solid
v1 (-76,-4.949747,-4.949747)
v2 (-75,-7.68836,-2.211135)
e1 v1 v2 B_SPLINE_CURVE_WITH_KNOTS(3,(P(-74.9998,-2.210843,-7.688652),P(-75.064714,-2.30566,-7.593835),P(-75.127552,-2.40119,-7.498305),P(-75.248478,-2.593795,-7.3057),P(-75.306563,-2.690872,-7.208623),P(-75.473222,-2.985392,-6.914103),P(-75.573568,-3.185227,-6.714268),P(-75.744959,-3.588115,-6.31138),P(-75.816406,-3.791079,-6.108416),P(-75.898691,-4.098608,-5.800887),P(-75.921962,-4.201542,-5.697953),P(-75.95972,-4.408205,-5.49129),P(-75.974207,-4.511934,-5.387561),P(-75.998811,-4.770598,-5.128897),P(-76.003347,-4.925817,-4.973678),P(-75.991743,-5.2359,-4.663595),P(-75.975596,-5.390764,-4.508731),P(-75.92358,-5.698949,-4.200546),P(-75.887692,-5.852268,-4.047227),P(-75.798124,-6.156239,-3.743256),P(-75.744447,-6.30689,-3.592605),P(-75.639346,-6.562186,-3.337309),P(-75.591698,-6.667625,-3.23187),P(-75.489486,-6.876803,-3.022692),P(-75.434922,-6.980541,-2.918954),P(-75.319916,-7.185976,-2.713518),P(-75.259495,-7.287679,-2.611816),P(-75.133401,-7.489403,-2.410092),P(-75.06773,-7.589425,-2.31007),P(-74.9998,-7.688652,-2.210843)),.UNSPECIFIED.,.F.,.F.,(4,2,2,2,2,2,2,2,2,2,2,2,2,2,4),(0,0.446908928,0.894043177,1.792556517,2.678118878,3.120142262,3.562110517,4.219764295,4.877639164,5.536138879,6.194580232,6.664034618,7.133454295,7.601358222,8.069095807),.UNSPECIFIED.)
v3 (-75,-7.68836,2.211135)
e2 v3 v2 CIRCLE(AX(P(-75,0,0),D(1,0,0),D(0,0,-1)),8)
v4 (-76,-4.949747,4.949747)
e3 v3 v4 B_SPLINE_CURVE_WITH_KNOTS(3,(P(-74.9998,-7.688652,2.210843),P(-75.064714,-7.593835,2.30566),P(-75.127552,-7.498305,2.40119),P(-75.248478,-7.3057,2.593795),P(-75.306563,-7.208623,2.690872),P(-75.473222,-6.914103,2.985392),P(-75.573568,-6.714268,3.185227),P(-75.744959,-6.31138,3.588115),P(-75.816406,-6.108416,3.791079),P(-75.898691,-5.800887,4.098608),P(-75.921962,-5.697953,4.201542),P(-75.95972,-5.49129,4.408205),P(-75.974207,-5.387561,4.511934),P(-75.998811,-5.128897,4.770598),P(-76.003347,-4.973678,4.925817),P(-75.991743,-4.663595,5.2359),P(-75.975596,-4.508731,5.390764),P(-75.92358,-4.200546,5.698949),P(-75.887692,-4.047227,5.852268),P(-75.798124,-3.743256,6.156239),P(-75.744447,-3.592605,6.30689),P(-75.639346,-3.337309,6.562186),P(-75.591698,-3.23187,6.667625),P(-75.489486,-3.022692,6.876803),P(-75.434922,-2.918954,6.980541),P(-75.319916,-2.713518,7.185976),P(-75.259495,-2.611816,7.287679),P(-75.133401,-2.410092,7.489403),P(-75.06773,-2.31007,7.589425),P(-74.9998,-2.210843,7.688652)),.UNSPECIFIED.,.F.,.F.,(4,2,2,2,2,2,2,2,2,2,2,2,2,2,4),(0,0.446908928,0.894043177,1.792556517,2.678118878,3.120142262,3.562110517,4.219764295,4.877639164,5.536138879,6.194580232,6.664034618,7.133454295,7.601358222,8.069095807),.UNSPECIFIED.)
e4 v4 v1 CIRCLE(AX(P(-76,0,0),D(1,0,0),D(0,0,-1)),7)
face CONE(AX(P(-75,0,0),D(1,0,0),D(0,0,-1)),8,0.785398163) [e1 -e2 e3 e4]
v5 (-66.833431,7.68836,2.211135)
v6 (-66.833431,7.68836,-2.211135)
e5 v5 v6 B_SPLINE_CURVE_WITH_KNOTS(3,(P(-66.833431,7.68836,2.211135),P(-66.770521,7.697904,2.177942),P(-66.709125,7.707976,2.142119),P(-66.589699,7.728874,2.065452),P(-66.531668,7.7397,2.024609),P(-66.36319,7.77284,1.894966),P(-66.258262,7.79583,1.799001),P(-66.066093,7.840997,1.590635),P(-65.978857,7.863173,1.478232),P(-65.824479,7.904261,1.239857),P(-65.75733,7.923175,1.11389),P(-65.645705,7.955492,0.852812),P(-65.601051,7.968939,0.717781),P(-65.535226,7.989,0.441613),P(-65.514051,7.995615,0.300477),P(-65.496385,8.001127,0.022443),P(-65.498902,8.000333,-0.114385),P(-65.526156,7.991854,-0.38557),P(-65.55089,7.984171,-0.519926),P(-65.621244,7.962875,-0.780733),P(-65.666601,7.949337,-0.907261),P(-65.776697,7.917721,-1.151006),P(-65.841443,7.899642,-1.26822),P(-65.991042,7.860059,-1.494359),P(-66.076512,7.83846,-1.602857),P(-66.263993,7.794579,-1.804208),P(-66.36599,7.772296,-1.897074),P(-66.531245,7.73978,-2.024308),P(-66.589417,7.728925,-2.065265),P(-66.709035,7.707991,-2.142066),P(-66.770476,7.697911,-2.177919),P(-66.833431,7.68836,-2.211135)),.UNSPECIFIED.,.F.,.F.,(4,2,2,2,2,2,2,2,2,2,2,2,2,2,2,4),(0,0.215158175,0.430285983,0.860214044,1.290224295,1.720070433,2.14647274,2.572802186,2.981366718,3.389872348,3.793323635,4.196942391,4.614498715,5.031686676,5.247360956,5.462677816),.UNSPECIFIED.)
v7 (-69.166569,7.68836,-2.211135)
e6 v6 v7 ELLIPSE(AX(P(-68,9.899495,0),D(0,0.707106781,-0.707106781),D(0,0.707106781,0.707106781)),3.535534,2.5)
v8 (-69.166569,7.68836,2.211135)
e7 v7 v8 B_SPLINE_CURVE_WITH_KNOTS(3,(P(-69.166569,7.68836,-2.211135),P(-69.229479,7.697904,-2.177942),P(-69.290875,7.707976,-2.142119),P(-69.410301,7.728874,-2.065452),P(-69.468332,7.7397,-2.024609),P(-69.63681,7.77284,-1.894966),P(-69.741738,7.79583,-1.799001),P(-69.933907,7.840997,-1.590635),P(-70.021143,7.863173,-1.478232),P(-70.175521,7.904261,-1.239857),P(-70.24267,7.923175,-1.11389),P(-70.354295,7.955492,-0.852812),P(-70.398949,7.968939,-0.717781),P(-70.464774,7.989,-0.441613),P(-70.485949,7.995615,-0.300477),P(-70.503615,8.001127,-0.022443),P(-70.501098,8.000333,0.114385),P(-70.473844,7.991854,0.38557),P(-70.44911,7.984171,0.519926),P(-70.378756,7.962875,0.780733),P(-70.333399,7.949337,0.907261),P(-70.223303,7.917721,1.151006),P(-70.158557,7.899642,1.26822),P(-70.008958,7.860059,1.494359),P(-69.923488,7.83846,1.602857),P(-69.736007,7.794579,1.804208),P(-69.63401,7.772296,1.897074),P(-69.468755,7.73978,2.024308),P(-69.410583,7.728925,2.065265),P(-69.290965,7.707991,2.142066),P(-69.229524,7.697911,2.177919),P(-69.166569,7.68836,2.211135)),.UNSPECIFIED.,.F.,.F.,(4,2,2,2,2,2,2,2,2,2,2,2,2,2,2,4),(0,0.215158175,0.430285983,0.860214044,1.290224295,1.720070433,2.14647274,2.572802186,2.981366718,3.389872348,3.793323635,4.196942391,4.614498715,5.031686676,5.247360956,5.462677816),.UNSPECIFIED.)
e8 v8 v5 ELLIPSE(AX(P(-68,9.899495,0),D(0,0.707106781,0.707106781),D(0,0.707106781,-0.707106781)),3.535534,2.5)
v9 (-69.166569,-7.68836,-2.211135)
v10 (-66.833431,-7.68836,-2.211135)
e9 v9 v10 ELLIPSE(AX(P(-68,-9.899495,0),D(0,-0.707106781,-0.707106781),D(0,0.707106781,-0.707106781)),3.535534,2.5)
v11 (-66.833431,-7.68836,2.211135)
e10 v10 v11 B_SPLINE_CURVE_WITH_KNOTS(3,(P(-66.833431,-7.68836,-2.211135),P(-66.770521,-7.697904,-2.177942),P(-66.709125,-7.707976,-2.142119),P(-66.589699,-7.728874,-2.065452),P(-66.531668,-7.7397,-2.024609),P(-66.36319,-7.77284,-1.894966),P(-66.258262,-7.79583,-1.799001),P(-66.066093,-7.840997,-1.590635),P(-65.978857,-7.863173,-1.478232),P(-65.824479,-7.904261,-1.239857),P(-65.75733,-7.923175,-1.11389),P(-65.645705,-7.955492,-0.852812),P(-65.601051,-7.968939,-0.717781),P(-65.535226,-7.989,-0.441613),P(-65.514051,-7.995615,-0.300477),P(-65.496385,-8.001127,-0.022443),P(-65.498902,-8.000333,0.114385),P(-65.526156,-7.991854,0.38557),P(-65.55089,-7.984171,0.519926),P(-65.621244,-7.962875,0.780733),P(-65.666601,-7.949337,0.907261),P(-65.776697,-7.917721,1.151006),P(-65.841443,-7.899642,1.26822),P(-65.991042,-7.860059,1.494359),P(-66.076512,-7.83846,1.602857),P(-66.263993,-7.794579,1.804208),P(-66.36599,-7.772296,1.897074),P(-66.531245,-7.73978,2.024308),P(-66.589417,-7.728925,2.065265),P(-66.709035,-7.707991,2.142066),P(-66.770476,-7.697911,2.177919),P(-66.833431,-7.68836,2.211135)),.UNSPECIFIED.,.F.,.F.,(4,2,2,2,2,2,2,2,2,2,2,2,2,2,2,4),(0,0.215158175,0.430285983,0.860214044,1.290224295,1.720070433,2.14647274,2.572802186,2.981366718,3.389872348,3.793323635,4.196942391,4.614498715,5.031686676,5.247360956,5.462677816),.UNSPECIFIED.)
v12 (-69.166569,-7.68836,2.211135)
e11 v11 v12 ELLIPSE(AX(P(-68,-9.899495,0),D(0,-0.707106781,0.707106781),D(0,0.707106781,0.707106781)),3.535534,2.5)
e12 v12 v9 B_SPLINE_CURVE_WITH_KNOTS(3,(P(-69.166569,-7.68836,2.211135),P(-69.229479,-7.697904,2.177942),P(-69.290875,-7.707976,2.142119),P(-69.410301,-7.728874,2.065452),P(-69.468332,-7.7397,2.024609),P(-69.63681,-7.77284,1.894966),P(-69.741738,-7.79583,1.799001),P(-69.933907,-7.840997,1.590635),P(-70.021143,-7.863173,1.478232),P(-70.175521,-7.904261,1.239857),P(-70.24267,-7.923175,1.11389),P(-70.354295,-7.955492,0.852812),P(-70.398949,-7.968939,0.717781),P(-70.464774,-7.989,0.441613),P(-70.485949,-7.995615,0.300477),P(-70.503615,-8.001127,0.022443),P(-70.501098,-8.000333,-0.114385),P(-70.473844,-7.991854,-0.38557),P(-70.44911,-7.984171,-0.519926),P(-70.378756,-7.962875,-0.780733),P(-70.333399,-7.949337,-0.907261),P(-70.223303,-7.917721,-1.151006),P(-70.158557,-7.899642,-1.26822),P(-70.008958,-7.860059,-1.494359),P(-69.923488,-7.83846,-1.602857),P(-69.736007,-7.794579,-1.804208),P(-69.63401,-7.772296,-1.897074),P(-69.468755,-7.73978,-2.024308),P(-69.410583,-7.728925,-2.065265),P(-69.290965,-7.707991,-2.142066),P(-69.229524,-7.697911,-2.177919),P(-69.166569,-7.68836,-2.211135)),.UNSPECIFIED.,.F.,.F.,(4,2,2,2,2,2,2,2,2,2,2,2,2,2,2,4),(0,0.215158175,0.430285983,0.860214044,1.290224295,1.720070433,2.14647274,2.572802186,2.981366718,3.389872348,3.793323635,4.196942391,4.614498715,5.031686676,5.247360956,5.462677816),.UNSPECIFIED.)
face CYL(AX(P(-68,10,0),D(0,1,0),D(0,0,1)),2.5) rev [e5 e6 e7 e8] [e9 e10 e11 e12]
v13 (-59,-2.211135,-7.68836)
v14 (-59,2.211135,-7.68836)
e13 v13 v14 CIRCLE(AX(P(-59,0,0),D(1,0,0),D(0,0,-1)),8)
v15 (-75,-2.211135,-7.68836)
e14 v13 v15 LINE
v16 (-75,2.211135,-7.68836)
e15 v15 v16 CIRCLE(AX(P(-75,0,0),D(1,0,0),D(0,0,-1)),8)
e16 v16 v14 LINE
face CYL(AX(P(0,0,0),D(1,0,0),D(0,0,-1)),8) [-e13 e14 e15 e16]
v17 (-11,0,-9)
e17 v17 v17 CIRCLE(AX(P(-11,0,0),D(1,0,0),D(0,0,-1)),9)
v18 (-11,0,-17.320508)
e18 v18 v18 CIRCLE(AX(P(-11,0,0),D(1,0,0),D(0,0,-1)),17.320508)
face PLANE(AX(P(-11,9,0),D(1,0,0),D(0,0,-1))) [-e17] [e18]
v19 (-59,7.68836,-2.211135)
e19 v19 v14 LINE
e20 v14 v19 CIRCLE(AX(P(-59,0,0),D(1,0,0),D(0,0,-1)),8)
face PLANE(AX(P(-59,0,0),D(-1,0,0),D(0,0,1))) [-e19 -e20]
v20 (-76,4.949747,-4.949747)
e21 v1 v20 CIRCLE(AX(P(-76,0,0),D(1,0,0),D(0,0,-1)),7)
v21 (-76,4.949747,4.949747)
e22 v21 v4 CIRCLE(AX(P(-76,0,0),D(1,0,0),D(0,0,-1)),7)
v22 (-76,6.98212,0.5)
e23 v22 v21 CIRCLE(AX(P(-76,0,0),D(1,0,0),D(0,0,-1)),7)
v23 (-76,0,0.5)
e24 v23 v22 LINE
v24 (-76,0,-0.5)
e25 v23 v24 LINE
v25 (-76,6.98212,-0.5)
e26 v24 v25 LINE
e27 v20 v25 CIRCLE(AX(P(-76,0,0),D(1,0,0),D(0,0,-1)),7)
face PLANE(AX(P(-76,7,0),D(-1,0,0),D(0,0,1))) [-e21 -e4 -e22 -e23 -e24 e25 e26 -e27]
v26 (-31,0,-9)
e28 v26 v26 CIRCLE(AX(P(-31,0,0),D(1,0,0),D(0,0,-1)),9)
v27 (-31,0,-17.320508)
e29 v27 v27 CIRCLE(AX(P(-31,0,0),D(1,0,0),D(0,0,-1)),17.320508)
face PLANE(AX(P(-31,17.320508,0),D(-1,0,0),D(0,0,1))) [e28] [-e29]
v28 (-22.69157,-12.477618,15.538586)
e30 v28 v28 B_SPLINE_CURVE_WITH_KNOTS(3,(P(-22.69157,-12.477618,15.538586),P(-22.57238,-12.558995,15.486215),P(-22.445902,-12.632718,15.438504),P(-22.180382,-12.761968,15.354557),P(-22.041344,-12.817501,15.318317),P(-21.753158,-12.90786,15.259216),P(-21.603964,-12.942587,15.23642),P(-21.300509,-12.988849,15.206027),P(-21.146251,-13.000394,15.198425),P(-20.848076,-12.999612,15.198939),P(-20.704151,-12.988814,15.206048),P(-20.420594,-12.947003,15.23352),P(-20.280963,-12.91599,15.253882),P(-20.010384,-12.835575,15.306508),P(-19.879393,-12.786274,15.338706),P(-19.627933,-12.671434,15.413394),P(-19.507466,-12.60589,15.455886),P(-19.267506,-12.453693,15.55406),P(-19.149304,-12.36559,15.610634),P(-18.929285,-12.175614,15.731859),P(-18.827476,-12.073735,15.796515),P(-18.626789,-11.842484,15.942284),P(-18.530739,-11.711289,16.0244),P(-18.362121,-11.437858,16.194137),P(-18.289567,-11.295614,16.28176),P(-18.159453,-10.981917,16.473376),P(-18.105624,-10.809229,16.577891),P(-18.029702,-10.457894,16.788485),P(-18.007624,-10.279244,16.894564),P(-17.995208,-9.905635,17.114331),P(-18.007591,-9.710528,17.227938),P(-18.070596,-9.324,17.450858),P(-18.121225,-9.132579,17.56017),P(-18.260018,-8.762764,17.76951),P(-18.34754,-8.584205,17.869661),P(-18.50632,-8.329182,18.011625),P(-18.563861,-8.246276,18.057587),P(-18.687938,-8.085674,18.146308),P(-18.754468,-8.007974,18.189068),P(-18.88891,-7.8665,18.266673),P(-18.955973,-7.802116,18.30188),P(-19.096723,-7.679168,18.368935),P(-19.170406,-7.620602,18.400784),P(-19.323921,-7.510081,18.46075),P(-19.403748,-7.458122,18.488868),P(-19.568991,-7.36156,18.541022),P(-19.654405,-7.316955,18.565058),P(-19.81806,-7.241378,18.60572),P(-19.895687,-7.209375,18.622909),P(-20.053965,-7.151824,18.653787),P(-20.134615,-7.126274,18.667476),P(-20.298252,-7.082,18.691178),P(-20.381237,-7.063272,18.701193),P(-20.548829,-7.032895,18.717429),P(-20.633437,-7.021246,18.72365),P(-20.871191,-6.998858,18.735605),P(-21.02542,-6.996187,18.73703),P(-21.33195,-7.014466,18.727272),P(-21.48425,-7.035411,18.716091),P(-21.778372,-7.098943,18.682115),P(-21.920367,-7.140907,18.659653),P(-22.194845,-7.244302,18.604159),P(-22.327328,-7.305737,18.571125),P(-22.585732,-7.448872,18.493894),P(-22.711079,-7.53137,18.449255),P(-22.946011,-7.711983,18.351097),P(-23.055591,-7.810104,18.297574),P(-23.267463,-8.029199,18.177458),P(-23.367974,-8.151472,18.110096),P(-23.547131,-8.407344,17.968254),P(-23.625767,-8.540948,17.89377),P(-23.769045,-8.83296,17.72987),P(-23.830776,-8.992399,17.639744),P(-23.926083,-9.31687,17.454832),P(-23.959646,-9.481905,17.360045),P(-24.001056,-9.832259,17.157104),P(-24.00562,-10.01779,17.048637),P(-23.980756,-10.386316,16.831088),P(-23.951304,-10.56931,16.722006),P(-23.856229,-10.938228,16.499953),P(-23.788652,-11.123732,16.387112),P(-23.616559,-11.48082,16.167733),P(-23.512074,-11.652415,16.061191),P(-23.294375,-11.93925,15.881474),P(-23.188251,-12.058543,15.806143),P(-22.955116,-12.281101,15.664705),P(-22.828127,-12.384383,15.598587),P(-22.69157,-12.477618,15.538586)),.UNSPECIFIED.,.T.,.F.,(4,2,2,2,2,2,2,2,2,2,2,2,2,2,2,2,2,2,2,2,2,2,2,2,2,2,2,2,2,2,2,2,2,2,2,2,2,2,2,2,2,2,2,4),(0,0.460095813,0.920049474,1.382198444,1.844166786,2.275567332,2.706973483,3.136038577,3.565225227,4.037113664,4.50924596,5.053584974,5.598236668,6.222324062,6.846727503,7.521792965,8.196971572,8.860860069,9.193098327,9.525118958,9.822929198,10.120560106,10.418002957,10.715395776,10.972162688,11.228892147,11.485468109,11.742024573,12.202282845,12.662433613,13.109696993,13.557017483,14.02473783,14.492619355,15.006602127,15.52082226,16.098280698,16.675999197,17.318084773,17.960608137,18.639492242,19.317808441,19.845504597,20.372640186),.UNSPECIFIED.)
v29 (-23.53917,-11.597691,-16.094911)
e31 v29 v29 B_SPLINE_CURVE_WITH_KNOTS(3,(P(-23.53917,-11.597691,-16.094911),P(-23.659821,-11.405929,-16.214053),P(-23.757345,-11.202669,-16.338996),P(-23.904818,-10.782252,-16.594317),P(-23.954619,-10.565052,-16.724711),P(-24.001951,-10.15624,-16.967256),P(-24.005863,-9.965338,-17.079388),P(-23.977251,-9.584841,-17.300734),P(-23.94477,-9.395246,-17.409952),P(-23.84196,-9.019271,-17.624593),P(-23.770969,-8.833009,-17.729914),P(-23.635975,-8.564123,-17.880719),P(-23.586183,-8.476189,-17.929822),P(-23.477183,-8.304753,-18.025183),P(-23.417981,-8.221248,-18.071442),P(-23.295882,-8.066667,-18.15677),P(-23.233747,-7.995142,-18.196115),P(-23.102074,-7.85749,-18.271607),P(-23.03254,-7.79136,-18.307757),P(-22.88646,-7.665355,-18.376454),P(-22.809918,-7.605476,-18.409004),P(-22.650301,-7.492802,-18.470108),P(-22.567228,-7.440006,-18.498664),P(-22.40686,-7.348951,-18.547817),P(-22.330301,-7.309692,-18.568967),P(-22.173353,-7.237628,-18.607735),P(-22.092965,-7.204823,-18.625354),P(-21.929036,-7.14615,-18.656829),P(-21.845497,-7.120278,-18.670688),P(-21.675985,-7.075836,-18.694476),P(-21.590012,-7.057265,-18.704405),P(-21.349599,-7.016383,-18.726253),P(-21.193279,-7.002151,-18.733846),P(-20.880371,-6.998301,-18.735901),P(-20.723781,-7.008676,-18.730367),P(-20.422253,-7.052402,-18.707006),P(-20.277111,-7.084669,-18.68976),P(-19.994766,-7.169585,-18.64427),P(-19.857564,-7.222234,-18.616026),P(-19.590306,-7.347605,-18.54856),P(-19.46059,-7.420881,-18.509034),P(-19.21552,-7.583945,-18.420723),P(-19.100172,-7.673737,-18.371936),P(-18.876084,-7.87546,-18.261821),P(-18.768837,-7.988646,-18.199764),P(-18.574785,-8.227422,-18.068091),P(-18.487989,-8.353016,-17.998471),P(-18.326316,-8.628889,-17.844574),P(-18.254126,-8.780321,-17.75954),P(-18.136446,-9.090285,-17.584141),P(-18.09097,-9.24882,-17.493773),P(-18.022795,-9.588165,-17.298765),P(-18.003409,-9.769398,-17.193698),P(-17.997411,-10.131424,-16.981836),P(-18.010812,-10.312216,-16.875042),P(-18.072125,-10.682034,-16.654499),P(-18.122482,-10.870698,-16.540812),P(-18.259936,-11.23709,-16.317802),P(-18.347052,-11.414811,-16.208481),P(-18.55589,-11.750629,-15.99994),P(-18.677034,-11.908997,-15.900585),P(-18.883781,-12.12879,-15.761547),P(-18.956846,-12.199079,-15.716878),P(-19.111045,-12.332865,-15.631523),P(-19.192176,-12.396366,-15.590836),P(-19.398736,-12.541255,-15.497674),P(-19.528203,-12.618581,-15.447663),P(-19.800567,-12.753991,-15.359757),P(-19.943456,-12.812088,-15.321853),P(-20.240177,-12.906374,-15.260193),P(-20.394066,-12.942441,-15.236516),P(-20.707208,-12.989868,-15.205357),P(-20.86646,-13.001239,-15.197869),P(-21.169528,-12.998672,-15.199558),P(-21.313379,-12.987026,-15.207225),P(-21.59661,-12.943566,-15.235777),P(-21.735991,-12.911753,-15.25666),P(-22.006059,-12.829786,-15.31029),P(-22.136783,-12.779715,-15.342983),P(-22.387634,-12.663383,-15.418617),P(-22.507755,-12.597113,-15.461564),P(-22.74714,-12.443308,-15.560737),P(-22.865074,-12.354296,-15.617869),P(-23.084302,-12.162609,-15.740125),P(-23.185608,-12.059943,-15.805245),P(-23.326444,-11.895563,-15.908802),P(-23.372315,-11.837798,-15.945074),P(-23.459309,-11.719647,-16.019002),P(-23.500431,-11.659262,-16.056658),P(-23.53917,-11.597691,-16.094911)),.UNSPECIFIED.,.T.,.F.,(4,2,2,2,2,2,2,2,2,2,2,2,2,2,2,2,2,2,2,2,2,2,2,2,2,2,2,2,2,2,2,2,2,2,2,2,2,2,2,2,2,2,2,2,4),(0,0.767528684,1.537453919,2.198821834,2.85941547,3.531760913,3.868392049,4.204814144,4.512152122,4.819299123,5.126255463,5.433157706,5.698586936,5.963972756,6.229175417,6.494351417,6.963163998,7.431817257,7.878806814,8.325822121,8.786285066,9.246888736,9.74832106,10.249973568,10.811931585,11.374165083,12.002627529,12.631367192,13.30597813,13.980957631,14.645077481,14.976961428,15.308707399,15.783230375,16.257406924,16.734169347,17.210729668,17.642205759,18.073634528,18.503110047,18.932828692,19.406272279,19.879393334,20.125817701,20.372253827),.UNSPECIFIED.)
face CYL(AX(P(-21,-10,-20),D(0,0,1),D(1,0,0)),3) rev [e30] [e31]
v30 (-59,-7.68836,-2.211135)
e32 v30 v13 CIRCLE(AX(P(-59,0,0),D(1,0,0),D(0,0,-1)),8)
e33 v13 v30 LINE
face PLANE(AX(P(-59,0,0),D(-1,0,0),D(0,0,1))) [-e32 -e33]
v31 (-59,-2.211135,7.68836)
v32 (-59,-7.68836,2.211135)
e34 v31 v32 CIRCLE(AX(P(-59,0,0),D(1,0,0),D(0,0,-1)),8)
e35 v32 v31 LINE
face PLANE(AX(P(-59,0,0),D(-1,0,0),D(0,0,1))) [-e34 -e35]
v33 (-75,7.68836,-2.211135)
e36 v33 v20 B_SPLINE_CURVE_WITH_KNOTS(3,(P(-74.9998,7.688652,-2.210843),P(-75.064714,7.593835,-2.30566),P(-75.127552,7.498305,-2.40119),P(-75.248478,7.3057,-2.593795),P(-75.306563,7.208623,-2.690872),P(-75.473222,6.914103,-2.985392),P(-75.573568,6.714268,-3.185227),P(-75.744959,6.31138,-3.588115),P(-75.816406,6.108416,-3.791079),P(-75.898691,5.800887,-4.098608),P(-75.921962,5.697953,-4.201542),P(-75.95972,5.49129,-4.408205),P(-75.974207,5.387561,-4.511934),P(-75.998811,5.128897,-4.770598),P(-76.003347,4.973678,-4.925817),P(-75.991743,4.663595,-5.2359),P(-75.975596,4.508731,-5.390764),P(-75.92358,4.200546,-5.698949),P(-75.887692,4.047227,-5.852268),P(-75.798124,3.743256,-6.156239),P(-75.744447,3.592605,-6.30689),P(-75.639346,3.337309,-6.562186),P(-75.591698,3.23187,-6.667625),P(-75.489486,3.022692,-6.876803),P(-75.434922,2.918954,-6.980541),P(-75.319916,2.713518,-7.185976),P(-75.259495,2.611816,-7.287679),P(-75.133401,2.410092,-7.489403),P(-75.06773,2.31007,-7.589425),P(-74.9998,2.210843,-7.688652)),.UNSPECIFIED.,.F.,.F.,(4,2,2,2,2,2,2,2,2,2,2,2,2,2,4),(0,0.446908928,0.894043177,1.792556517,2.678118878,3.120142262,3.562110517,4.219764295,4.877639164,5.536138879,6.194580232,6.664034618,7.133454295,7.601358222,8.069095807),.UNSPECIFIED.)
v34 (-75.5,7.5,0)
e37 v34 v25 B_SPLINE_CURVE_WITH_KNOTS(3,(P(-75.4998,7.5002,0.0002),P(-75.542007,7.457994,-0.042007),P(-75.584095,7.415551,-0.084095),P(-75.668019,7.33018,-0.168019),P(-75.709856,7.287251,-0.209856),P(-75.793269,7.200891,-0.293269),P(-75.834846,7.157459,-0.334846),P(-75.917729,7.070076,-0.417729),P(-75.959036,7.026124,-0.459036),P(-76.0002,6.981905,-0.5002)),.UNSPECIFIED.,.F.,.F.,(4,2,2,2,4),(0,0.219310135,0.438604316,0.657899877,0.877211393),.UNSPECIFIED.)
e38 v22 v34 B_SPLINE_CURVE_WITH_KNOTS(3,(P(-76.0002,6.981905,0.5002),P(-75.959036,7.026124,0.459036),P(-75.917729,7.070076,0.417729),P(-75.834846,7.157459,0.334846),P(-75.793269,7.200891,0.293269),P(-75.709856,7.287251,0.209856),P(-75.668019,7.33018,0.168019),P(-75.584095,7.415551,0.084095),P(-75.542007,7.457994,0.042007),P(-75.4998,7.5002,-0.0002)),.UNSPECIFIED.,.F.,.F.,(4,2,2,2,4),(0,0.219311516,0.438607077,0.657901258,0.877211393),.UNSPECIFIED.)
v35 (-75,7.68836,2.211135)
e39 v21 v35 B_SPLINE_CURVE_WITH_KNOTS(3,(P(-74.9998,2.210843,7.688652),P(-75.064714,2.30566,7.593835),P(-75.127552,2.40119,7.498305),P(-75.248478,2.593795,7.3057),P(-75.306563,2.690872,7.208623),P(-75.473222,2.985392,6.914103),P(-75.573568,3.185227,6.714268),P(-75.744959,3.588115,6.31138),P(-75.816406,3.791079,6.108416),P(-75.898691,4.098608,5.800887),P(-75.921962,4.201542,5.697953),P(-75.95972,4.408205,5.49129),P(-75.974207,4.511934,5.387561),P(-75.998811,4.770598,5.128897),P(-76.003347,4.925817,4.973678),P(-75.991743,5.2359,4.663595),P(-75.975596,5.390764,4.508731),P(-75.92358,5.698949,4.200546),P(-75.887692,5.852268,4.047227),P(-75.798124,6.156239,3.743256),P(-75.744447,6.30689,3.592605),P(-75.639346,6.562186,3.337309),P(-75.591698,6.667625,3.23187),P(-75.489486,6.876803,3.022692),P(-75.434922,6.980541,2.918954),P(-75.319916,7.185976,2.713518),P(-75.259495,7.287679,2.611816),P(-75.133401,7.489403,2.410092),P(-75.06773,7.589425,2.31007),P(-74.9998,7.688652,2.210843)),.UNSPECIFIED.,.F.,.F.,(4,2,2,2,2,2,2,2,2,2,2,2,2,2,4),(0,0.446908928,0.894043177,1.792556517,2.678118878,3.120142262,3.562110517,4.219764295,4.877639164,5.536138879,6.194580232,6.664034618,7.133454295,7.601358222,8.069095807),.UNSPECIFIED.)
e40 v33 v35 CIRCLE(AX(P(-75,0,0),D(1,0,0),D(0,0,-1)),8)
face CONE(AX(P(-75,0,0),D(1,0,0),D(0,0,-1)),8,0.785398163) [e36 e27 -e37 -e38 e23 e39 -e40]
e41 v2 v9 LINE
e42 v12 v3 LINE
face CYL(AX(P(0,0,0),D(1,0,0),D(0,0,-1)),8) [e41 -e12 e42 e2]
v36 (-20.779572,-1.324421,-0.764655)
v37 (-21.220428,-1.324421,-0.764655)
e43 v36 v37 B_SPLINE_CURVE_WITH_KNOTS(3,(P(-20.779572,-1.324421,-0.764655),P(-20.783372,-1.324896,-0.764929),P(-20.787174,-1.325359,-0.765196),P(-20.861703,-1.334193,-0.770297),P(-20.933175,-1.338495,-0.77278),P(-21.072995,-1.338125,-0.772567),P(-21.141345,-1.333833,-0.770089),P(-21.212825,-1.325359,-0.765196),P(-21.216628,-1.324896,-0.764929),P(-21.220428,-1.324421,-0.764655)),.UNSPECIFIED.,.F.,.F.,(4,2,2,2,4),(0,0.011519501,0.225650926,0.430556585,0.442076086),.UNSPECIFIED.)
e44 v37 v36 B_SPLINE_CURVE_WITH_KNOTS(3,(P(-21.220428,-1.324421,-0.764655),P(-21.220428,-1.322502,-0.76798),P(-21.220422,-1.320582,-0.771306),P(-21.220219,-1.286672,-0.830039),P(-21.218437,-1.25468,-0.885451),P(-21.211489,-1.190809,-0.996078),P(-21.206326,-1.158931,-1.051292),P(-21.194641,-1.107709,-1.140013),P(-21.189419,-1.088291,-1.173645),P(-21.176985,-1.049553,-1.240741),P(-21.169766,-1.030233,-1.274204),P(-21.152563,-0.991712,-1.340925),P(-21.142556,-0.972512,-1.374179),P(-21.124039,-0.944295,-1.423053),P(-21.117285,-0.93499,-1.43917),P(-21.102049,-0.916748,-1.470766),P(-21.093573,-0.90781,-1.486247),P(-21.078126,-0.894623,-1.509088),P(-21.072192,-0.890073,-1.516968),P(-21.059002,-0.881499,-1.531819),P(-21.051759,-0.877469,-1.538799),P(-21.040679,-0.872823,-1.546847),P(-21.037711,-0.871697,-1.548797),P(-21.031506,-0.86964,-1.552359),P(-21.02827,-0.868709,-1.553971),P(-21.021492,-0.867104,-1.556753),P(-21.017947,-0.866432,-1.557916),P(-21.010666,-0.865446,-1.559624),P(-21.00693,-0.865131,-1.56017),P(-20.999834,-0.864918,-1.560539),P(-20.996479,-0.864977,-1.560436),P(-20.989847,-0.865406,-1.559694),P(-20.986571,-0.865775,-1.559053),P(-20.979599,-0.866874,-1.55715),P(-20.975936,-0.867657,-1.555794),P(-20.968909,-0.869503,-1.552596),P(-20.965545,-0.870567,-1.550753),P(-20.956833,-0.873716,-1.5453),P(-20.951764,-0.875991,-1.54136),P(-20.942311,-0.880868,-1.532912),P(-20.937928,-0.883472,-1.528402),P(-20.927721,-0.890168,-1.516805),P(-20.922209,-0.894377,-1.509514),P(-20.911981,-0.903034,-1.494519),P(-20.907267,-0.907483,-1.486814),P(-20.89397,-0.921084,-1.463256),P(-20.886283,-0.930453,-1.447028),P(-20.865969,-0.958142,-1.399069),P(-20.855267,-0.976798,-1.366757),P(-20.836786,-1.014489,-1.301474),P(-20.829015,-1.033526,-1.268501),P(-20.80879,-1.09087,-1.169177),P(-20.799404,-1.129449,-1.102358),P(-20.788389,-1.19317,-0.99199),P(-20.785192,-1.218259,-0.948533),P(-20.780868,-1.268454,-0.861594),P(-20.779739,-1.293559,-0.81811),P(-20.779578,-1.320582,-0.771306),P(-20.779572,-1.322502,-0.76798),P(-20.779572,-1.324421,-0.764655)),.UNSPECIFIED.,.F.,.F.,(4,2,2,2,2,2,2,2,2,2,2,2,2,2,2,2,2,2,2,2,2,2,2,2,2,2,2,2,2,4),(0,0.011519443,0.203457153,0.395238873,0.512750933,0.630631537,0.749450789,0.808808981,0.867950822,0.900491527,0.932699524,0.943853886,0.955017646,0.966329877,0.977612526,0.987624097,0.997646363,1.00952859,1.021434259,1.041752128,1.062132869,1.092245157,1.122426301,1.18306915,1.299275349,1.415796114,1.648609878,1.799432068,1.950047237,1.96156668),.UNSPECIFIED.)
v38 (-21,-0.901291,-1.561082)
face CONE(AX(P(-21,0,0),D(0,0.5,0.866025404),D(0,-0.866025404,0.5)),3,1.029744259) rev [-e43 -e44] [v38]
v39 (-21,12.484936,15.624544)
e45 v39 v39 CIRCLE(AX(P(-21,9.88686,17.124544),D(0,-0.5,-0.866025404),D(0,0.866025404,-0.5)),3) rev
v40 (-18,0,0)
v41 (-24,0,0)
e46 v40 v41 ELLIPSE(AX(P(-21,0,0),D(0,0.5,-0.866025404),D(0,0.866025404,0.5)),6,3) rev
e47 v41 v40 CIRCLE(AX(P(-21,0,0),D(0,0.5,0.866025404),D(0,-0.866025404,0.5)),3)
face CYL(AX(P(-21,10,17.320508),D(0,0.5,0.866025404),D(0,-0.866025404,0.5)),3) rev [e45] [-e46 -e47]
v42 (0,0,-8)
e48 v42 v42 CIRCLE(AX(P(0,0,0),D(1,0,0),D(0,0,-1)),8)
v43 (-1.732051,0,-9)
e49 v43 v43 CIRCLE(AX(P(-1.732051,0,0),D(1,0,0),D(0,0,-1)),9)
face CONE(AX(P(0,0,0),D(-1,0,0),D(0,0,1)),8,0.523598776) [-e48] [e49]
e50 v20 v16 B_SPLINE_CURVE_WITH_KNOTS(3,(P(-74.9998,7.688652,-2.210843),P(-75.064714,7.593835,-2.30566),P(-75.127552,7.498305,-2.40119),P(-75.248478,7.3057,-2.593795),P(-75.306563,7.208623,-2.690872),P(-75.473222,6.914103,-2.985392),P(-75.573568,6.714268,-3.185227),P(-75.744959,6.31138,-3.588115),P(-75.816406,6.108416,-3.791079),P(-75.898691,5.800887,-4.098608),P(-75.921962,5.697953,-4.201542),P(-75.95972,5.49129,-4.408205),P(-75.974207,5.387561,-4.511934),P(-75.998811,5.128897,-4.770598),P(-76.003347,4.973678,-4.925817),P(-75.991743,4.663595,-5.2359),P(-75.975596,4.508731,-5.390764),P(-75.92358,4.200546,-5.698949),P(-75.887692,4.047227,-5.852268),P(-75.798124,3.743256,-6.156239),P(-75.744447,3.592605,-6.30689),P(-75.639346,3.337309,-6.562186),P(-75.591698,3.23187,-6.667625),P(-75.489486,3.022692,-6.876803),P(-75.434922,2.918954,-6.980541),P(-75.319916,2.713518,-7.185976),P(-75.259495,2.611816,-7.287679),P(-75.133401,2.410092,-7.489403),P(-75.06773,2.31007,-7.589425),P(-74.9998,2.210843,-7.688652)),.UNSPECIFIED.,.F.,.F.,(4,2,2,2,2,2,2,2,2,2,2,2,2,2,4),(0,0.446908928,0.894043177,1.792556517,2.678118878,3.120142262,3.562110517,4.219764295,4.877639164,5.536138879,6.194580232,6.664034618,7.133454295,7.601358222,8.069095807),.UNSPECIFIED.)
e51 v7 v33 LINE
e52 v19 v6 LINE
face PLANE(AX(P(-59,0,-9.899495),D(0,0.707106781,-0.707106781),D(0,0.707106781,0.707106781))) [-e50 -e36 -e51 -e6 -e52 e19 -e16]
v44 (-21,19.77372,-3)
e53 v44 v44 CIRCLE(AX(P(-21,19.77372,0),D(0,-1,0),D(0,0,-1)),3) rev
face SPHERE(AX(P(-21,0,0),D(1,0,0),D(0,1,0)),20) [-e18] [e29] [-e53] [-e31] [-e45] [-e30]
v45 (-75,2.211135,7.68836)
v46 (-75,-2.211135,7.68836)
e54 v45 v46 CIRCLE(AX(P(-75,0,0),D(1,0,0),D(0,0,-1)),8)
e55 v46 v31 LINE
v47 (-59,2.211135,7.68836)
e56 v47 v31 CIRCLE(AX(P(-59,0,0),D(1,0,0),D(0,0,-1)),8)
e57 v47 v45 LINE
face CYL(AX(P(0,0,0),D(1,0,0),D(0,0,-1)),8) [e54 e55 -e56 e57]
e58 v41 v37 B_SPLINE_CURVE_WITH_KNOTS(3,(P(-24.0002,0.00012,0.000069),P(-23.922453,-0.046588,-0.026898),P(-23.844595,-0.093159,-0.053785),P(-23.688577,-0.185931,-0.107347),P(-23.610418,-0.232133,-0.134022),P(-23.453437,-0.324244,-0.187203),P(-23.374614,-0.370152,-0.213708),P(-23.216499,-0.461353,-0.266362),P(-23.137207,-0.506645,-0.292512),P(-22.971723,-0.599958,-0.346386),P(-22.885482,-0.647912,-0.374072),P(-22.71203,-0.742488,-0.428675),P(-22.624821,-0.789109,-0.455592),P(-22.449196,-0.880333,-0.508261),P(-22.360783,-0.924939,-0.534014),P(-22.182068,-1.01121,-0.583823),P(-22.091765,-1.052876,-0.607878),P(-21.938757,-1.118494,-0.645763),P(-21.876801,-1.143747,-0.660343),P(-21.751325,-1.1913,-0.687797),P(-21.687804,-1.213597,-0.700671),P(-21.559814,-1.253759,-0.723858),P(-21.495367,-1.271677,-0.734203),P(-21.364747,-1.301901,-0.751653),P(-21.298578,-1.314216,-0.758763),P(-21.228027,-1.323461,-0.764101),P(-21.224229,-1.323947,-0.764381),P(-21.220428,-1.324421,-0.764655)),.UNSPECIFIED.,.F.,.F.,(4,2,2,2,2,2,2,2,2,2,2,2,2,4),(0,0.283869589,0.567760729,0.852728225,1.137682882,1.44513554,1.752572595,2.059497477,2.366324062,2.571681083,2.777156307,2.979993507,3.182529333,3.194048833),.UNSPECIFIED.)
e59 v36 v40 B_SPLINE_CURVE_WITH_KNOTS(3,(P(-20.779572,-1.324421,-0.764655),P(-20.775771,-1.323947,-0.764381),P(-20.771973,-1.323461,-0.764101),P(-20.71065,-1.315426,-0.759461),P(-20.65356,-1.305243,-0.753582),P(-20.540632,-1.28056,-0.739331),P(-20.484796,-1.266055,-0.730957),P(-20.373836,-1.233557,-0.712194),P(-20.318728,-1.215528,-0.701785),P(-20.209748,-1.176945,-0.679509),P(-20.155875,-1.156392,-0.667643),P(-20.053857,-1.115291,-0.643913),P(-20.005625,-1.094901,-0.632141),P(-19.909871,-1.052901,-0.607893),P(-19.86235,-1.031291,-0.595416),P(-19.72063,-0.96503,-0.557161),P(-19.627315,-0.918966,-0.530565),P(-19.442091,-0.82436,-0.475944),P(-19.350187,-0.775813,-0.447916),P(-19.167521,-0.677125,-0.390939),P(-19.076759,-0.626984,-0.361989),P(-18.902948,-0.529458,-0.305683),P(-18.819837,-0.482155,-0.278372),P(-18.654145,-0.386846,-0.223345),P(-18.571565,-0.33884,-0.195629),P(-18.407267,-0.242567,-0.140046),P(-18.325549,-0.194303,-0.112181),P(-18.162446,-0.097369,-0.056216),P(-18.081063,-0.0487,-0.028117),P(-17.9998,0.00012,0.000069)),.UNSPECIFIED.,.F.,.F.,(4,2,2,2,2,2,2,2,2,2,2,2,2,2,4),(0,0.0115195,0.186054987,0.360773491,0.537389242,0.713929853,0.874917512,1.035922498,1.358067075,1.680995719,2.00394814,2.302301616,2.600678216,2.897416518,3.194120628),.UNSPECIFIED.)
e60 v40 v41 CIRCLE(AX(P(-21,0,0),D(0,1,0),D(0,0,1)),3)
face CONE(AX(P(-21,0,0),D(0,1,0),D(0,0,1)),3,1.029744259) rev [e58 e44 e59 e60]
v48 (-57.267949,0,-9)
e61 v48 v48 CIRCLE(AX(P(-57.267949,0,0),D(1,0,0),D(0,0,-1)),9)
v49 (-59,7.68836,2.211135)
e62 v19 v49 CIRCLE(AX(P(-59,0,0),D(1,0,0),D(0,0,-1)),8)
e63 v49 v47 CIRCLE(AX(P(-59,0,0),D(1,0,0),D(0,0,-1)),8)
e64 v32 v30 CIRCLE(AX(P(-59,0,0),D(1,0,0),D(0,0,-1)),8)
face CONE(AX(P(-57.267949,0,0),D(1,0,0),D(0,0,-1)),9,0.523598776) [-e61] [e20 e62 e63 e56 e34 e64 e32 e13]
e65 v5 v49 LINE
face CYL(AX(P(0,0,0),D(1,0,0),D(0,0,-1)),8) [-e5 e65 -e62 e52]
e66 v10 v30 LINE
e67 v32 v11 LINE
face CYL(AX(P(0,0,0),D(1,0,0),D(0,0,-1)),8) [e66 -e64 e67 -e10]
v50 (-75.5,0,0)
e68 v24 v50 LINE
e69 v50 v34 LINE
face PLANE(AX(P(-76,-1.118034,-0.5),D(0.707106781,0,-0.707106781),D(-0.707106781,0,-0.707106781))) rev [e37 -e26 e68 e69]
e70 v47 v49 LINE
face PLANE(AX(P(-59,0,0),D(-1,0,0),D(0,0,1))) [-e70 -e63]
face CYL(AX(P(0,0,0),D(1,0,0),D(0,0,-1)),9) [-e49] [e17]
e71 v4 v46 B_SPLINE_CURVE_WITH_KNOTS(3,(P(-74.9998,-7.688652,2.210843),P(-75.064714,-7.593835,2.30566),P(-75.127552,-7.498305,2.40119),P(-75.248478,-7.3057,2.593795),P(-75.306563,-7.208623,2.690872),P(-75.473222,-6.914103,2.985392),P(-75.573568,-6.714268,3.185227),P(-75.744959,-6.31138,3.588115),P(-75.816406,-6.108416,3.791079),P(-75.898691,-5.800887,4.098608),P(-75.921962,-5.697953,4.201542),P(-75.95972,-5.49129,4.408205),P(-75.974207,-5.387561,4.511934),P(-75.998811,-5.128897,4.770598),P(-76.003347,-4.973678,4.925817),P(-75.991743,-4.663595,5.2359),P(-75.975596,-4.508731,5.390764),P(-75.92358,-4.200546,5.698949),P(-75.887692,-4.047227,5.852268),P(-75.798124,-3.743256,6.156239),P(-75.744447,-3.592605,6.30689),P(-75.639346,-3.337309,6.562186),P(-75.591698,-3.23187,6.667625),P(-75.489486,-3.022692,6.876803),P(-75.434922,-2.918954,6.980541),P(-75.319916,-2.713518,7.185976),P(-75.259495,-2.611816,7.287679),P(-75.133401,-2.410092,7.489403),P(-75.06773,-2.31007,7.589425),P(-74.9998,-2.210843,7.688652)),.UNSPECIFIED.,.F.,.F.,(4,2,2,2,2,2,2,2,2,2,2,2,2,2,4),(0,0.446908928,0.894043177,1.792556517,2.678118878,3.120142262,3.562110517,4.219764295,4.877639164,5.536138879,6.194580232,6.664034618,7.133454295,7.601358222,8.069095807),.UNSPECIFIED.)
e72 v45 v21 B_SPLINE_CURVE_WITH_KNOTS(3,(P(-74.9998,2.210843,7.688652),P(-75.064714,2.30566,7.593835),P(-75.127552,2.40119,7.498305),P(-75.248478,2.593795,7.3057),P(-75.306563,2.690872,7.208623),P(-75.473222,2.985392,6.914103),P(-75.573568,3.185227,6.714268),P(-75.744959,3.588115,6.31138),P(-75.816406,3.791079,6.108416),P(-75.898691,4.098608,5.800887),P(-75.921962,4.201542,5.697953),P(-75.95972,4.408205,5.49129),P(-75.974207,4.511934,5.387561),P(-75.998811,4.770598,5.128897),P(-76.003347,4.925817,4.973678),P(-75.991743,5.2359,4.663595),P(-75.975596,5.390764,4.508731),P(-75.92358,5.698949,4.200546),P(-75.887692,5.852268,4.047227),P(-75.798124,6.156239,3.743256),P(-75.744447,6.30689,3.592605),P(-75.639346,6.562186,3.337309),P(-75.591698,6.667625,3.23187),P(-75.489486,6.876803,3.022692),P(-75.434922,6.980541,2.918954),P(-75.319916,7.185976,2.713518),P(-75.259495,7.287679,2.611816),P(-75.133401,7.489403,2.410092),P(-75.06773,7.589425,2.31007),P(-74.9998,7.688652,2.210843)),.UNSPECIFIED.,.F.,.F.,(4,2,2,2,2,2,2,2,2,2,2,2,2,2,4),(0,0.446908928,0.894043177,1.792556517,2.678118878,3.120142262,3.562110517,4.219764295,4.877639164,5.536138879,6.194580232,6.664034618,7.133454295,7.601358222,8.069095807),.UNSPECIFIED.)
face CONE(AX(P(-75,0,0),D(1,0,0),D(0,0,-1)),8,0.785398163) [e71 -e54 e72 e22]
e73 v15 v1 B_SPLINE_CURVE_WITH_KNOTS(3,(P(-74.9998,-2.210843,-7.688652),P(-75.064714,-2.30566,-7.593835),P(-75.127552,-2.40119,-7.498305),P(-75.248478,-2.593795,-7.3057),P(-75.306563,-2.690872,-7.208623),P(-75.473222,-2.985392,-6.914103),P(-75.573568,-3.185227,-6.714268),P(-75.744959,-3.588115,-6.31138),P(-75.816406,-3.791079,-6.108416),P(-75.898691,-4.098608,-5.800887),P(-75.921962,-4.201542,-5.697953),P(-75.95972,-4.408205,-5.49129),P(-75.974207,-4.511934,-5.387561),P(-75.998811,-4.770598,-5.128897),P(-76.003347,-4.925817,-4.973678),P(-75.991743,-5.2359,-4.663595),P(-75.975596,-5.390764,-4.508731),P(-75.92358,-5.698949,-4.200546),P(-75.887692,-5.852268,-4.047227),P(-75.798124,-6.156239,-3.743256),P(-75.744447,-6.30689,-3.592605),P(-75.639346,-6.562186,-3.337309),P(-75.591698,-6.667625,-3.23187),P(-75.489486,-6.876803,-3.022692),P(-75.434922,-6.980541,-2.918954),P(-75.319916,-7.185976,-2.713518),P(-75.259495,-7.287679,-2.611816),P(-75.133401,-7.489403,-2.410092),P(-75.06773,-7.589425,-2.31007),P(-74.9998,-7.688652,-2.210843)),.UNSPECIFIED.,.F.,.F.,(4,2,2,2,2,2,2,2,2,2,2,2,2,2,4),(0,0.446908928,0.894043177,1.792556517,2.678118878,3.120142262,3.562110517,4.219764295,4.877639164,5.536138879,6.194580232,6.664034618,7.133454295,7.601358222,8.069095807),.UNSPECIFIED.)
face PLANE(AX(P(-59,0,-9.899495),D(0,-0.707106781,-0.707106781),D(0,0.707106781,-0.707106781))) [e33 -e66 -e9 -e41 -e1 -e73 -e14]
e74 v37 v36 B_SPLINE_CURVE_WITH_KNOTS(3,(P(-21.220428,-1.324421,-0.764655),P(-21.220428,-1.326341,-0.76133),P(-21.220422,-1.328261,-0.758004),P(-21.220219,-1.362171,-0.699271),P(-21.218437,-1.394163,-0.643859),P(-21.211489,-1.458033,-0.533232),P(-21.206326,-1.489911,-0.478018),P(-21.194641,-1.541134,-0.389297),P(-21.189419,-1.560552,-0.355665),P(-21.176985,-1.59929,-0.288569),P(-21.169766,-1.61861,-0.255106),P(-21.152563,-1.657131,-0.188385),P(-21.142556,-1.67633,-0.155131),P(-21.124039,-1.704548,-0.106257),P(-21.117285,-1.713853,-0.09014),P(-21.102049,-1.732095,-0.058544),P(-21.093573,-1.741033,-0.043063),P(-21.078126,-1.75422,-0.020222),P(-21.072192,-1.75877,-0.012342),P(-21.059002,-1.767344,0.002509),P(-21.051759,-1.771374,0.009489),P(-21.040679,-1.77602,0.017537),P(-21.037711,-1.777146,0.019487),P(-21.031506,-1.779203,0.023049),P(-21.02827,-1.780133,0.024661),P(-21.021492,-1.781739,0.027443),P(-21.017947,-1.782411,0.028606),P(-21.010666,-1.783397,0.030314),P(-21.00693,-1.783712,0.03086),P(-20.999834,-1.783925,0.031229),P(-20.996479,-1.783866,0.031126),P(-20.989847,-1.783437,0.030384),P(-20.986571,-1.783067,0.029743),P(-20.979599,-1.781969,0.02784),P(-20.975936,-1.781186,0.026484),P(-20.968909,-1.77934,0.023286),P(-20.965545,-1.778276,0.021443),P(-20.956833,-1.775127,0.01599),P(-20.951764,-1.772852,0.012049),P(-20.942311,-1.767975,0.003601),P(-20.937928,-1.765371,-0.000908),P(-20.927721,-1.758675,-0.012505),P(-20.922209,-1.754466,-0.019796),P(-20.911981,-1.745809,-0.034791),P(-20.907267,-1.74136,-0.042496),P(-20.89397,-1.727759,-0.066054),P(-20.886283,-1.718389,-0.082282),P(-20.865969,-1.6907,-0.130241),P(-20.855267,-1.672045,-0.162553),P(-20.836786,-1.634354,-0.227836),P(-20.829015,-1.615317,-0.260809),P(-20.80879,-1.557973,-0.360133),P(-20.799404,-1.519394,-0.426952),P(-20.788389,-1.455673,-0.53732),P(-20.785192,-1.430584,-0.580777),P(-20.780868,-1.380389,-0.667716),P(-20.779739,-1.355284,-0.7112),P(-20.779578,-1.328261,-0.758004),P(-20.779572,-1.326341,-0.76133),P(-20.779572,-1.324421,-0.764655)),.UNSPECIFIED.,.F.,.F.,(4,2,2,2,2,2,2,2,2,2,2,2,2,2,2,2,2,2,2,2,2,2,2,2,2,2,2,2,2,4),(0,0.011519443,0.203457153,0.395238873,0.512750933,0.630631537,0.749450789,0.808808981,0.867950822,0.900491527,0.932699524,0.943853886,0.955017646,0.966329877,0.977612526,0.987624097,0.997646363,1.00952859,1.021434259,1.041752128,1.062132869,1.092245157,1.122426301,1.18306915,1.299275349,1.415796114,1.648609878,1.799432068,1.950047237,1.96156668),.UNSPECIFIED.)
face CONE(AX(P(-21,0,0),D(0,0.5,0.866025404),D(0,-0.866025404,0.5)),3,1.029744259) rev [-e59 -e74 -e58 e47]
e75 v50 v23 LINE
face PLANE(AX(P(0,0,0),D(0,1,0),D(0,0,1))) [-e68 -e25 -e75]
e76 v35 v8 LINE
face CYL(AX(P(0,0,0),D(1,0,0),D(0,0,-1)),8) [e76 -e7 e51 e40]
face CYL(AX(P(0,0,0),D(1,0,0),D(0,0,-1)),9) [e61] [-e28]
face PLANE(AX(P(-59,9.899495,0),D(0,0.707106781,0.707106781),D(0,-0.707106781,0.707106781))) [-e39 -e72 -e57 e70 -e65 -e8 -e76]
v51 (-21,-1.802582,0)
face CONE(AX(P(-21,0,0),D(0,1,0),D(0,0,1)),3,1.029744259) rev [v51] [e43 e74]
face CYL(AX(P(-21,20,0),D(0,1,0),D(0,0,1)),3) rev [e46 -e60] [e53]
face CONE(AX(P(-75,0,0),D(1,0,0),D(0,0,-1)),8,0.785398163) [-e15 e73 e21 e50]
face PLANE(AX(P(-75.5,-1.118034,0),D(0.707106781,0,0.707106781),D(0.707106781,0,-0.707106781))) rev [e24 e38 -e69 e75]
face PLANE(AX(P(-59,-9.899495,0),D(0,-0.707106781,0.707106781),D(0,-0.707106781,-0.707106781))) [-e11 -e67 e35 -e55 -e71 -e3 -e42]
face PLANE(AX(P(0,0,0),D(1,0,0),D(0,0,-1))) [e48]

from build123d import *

# Parameters (mm, degrees)
CUT_EXTRUDE_1_DEPTH      = 82.092539731
CUT_EXTRUDE_1_DEPTH_BACK = 82.092539731
SKETCH_2_R               = 3
PATTERN_CIRCULAR_1_COUNT = 2
PATTERN_CIRCULAR_1_ANGLE = 60
SKETCH_6_OUTSIDE_W       = 60.93
SKETCH_6_OUTSIDE_H       = 60.704
CUT_EXTRUDE_2_DEPTH      = 17
HOLE_WIZARD_M61_D        = 5
CUT_EXTRUDE_3_DEPTH      = 10


with BuildPart() as part:
    # Эскиз1 → Повернуть1 (revolve)
    with BuildSketch(Plane.XY, mode=Mode.PRIVATE) as revolve_1_sk:
        with BuildLine():
            Line((0, 0), (0, 8))
            Line((0, 8), (-1.732050808, 9))
            Line((-1.732050808, 9), (-11, 9))
            Line((-11, 9), (-11, 17.320508076))
            ThreePointArc((-11, 17.320508076), (-21, 20), (-31, 17.320508076))
            Line((-31, 17.320508076), (-31, 9))
            Line((-31, 9), (-57.267949192, 9))
            Line((-57.267949192, 9), (-59, 8))
            Line((-59, 8), (-75, 8))
            Line((-75, 8), (-76, 7))
            Line((-76, 7), (-76, 0))
            Line((-76, 0), (0, 0))
        make_face()
    revolve(revolve_1_sk.sketch.rotate(Axis((0, 0, 0), (-1, 0, 0)), 90), axis=Axis((0, 0, 0), (-1, 0, 0)))

    # Эскиз2 → Вырез-Вытянуть1 (cut, two sides: drawn at the far end of the back side and taken through both)
    with BuildSketch(Plane.XY.offset(-CUT_EXTRUDE_1_DEPTH_BACK)):
        with Locations(Location((-21, -10, 0), (0, 0, 235.677064265))):
            Circle(SKETCH_2_R)
    extrude(amount=CUT_EXTRUDE_1_DEPTH + CUT_EXTRUDE_1_DEPTH_BACK, mode=Mode.SUBTRACT)

    # Эскиз4 → Диаметр отверстия Ø6.0 (6)1 (revolve, cut)
    with BuildSketch(Plane(origin=(-21, 20, 0), x_dir=(0, 0, 1), z_dir=(1, 0, 0))):
        Polygon((0, 0), (0, 21.802581857), (3, 20), (3, 0), align=None)
    hole_wizard_6_0_6_1 = revolve(axis=Axis((-21, 20, 0), (0, -1, 0)), mode=Mode.SUBTRACT)

    # Круговой массив1: Диаметр отверстия Ø6.0 (6)1 ×2 about axis
    pattern_circular_1_axis = Axis((0, 0, 0), (1, 0, 0))
    for i in range(1, PATTERN_CIRCULAR_1_COUNT):
        add(hole_wizard_6_0_6_1.rotate(pattern_circular_1_axis, i * PATTERN_CIRCULAR_1_ANGLE / (PATTERN_CIRCULAR_1_COUNT - 1)), mode=Mode.SUBTRACT)

    # Эскиз6 outside → Вырез-Вытянуть2 (cut)
    with BuildSketch(Plane.ZY.offset(76)):
        with Locations((0, -0.113)):
            Rectangle(SKETCH_6_OUTSIDE_W, SKETCH_6_OUTSIDE_H)
        Polygon((-9.899494937, 0), (0, 9.899494937), (9.899494937, 0), (0, -9.899494937), align=None, mode=Mode.SUBTRACT)
    extrude(amount=-CUT_EXTRUDE_2_DEPTH, mode=Mode.SUBTRACT)

    # Отверстие обработанное метчиком M61 (through all)
    with Locations(Plane(origin=(0, 10, 0), x_dir=(1, 0, 0), z_dir=(0, 1, 0))):
        with Locations((-68, 0)):
            Hole(HOLE_WIZARD_M61_D / 2)

    # Эскиз11 → Вырез-Вытянуть3 (cut)
    with BuildSketch(Plane(origin=(0, 10, 0), x_dir=(1, 0, 0), z_dir=(0, 1, 0))):
        Polygon((-76, 0.5), (-75.5, 0), (-76, -0.5), align=None)
    extrude(amount=-CUT_EXTRUDE_3_DEPTH, mode=Mode.SUBTRACT)


solid = part.part
